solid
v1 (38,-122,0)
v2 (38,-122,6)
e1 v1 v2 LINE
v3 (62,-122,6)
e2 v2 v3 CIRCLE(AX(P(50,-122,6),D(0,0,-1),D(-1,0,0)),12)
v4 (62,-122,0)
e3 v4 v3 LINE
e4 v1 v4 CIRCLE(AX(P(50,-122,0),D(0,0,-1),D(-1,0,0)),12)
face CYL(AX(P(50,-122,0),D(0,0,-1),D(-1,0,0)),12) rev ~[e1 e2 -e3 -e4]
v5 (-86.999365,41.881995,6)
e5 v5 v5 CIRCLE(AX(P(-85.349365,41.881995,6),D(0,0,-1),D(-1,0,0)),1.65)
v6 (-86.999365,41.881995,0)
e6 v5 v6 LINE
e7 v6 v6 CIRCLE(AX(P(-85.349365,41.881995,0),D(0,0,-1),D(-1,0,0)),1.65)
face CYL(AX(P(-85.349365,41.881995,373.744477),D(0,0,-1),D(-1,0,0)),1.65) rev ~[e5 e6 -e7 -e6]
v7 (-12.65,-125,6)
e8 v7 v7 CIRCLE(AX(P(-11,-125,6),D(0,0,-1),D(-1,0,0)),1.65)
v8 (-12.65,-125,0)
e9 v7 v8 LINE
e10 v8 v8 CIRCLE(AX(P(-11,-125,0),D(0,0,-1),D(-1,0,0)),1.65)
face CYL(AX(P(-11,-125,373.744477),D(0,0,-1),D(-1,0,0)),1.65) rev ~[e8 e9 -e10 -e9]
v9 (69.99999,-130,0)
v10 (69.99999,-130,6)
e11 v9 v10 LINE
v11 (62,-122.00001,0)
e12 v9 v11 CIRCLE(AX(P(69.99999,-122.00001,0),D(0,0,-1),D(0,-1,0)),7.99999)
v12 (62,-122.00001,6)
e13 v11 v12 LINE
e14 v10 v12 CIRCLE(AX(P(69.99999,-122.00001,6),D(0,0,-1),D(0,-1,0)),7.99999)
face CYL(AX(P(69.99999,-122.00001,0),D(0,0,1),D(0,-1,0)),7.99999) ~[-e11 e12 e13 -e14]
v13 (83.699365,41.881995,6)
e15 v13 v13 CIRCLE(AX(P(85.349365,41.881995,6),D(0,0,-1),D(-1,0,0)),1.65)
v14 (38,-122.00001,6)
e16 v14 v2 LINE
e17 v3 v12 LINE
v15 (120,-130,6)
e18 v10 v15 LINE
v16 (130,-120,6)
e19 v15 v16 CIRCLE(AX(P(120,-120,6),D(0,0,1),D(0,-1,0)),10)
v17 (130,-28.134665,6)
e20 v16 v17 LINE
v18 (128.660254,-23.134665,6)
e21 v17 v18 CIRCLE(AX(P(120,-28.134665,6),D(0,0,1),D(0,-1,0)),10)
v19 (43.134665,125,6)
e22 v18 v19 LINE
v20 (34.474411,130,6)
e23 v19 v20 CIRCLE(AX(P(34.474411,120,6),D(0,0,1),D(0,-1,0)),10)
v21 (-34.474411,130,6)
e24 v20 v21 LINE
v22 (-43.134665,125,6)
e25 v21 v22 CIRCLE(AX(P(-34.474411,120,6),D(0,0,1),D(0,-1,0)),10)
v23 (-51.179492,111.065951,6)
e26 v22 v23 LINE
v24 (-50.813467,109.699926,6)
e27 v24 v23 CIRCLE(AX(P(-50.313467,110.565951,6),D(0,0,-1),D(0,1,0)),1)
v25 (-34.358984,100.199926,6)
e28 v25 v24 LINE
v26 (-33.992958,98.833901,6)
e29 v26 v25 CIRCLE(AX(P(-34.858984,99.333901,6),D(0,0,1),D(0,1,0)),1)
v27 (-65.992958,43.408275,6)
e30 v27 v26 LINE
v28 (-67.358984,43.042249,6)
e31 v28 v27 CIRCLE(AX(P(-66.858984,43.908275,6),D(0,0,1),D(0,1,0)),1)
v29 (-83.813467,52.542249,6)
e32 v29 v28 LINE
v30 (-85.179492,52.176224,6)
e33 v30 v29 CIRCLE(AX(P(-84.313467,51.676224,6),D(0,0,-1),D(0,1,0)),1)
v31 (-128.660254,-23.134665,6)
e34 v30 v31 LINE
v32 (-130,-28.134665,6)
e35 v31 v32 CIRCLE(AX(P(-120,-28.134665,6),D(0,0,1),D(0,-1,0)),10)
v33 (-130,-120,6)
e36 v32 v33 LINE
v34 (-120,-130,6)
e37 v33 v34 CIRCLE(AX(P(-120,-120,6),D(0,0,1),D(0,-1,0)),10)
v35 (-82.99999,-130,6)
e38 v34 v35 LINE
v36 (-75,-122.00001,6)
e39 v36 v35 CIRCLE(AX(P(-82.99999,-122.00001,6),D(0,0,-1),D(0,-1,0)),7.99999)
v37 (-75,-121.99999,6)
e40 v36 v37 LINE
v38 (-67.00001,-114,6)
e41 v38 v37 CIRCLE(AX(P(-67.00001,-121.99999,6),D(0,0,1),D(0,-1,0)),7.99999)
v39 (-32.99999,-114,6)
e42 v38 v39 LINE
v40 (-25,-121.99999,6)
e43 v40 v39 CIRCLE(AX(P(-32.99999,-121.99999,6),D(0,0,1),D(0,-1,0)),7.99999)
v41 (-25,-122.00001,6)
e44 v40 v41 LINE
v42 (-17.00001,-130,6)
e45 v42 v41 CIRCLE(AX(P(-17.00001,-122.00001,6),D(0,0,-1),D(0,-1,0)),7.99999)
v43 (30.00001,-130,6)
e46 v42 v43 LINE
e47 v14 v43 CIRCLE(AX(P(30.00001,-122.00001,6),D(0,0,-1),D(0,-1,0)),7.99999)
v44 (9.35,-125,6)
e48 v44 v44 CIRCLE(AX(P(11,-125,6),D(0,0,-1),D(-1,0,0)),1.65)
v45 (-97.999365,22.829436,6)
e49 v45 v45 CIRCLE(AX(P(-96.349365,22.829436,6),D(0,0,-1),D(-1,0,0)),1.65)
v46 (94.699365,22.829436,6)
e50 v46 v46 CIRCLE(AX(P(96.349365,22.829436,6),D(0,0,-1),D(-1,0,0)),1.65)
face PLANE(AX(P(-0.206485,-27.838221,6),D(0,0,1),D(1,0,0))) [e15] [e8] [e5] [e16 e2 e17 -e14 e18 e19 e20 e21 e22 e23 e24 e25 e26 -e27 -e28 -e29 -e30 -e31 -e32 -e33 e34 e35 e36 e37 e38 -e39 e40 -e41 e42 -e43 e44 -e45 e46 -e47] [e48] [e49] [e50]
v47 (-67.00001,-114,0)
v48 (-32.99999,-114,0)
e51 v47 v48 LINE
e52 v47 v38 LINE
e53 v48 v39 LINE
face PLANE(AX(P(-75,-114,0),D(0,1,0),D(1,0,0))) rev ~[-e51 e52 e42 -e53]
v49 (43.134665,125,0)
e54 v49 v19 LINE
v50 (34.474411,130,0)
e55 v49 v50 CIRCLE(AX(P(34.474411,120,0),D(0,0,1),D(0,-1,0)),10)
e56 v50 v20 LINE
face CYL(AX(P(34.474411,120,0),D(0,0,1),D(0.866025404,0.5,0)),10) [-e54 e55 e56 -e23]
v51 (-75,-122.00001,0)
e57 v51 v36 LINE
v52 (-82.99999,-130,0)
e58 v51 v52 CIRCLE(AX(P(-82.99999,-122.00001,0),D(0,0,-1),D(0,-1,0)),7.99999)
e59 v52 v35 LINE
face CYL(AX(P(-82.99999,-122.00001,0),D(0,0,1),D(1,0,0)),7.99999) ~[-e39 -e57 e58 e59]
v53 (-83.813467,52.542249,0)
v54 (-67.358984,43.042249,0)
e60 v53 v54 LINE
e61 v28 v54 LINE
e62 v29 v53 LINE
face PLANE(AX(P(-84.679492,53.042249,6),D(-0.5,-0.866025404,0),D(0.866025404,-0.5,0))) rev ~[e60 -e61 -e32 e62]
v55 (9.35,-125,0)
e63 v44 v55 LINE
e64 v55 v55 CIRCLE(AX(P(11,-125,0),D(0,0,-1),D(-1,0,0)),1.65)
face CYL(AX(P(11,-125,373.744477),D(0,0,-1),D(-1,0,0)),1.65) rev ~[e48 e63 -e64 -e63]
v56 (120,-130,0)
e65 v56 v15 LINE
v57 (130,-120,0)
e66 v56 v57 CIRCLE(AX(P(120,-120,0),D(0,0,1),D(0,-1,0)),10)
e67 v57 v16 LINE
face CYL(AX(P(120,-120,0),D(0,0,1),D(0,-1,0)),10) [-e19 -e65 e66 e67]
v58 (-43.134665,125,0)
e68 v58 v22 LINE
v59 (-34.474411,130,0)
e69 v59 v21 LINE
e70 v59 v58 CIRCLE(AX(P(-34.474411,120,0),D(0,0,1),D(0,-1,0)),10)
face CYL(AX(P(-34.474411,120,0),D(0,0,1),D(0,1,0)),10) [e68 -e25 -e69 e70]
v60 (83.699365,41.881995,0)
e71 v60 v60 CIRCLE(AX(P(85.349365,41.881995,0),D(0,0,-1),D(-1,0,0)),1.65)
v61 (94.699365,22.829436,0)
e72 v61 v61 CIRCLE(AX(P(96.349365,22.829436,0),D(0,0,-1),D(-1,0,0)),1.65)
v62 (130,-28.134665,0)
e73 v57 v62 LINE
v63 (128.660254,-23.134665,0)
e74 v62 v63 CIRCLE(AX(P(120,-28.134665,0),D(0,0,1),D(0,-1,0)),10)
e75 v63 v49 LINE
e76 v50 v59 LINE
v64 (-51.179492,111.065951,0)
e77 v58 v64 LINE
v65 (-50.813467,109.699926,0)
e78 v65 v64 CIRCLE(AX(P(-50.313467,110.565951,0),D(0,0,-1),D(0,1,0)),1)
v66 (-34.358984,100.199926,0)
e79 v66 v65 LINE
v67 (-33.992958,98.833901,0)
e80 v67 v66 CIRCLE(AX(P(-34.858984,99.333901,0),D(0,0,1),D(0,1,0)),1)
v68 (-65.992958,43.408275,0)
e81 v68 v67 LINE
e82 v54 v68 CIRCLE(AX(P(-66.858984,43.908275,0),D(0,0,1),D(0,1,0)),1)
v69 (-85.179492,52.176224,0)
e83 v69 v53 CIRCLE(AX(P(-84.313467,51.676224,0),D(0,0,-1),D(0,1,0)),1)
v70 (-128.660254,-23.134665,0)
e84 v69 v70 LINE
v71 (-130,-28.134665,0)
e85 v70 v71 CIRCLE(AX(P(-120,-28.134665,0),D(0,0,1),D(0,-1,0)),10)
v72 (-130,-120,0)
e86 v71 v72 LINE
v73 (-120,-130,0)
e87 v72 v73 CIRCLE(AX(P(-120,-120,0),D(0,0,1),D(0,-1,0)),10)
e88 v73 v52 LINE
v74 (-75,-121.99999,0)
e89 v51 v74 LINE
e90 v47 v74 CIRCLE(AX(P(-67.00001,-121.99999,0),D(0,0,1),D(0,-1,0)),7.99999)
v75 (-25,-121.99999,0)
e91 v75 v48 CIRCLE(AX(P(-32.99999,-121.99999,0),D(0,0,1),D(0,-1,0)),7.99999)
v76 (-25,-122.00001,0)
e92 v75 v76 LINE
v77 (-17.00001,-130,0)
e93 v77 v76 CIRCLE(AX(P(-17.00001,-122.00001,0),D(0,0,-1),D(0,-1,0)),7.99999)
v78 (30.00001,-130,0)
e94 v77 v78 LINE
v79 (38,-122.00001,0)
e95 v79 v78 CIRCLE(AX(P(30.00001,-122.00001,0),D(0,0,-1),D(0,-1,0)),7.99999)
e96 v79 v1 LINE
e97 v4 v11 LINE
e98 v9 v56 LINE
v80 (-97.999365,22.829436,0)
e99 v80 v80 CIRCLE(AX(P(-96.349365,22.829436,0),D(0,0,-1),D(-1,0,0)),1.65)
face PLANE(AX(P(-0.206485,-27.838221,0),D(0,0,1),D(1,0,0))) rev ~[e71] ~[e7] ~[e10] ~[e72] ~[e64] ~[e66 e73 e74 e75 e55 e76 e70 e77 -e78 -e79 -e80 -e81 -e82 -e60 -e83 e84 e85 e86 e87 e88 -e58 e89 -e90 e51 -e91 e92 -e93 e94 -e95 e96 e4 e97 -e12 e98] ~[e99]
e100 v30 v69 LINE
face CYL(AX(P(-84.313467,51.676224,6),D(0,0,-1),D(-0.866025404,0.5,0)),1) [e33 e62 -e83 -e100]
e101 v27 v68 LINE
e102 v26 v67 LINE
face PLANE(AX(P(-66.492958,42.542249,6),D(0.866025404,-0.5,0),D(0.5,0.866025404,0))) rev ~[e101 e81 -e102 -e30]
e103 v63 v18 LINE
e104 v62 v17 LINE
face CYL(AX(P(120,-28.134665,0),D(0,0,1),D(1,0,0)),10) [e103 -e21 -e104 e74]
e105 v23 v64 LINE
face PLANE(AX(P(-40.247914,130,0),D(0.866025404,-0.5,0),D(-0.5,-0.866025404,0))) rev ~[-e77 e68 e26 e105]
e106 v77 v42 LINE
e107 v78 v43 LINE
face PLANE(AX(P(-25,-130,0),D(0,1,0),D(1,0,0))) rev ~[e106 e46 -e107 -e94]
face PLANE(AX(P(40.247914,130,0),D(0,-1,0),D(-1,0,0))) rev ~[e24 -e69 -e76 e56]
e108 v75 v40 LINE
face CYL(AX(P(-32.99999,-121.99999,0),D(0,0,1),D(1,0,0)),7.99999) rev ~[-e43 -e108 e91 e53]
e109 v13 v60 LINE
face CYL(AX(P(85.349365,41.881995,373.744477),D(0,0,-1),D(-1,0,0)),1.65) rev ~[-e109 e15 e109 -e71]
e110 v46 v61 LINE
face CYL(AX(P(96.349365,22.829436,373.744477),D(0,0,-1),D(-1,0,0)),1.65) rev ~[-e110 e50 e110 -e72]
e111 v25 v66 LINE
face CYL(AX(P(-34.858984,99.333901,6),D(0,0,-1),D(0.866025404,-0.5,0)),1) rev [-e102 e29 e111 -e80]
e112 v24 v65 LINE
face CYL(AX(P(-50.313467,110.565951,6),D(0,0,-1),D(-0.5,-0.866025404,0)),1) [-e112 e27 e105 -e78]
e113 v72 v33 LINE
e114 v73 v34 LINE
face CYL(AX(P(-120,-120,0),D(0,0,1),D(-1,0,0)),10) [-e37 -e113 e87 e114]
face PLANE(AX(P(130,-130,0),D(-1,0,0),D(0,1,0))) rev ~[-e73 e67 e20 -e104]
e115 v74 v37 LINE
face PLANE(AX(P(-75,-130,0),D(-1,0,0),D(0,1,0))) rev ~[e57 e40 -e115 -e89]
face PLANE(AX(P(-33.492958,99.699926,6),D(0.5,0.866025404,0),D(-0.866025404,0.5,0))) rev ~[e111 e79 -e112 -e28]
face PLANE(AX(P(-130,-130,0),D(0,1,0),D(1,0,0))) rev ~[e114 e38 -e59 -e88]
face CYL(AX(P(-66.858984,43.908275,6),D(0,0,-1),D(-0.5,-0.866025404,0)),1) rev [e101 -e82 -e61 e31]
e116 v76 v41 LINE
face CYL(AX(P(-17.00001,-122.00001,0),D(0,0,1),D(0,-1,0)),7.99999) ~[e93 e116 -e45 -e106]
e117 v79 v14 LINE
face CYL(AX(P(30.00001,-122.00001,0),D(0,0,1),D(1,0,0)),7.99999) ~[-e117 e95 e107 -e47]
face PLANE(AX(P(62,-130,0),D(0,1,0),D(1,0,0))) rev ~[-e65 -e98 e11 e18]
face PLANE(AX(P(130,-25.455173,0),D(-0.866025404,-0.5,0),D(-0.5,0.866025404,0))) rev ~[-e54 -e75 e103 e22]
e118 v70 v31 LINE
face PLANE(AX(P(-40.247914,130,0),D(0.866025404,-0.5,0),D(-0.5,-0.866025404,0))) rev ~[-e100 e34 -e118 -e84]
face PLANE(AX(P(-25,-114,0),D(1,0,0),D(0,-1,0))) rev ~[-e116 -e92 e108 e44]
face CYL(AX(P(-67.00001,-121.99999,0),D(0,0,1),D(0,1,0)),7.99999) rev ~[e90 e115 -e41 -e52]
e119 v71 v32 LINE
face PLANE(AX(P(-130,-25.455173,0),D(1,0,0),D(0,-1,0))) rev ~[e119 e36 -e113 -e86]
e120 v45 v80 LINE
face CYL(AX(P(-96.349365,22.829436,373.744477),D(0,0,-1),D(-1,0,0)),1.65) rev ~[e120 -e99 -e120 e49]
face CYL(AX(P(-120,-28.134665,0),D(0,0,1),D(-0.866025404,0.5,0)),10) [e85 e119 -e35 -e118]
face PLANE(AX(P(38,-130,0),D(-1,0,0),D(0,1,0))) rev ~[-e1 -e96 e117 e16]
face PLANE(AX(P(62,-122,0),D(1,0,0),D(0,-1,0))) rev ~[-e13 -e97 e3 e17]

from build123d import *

# Parameters (mm, degrees)
F1_DEPTH = 6
F2_R     = 10
F3_R     = 7.99999
F5_D     = 3.3
F6_DEPTH = 6.001
F7_R     = 1


# Not quite as in the source:
# - a fillet or chamfer is up to 0.001 mm smaller than in the source, because OpenCascade refuses the exact size


with BuildPart() as f1:
    # F0 (on Top) → F1 (new body)
    with BuildSketch(Plane.XY):
        with BuildLine():
            Line((62, -130), (130, -130))
            Line((130, -130), (130, -25.455173281))
            Line((130, -25.455173281), (40.2479138593, 130))
            Line((40.2479138593, 130), (-40.2479138593, 130))
            Line((-40.2479138593, 130), (-130, -25.455173281))
            Line((-130, -25.455173281), (-130, -130))
            Line((-130, -130), (-75, -130))
            Line((-75, -130), (-75, -114))
            Line((-75, -114), (-25, -114))
            Line((-25, -114), (-25, -130))
            Line((-25, -130), (38, -130))
            Line((38, -130), (38, -122))
            ThreePointArc((38, -122), (50, -110), (62, -122))
            Line((62, -122), (62, -130))
        make_face()
    extrude(amount=F1_DEPTH)

    # F2
    f2_edges = [f1.edges().sort_by_distance(p)[0] for p in [
        (130, -25.455173, 3),
        (40.247914, 130, 3),
        (-40.247914, 130, 3),
        (-130, -25.455173, 3),
        (130, -130, 3),
        (-130, -130, 3),
    ]]
    fillet(f2_edges, radius=F2_R)

    # F3 (radius 8 in the source; OpenCascade refuses exactly that, so slightly less here)
    f3_edges = [f1.edges().sort_by_distance(p)[0] for p in [
        (-75, -130, 3),
        (-75, -114, 3),
        (-25, -114, 3),
        (-25, -130, 3),
        (38, -130, 3),
        (62, -130, 3),
    ]]
    fillet(f3_edges, radius=F3_R)

    # F5 (through all)
    with Locations(Plane.XY.offset(6)):
        with Locations((11, -125), (-11, -125), (-96.3493649054, 22.8294364099), (-85.3493649054, 41.8819952931), (96.3493649054, 22.8294364099), (85.3493649054, 41.8819952931)):
            Hole(F5_D / 2)

    # F4 (on face) → F6 (cut, through all)
    with BuildSketch(Plane.XY.offset(6)):
        Polygon((-51.6794919243, 110.1999259807), (-84.6794919243, 53.042249331), (-66.4929584448, 42.542249331), (-33.4929584448, 99.6999259807), align=None)
    extrude(amount=-F6_DEPTH, mode=Mode.SUBTRACT)

    # F7
    f7_edges = [f1.edges().sort_by_distance(p)[0] for p in [
        (-33.492958, 99.699926, 3),
        (-66.492958, 42.542249, 3),
        (-51.679492, 110.199926, 3),
        (-84.679492, 53.042249, 3),
    ]]
    fillet(f7_edges, radius=F7_R)


solid = f1.part
